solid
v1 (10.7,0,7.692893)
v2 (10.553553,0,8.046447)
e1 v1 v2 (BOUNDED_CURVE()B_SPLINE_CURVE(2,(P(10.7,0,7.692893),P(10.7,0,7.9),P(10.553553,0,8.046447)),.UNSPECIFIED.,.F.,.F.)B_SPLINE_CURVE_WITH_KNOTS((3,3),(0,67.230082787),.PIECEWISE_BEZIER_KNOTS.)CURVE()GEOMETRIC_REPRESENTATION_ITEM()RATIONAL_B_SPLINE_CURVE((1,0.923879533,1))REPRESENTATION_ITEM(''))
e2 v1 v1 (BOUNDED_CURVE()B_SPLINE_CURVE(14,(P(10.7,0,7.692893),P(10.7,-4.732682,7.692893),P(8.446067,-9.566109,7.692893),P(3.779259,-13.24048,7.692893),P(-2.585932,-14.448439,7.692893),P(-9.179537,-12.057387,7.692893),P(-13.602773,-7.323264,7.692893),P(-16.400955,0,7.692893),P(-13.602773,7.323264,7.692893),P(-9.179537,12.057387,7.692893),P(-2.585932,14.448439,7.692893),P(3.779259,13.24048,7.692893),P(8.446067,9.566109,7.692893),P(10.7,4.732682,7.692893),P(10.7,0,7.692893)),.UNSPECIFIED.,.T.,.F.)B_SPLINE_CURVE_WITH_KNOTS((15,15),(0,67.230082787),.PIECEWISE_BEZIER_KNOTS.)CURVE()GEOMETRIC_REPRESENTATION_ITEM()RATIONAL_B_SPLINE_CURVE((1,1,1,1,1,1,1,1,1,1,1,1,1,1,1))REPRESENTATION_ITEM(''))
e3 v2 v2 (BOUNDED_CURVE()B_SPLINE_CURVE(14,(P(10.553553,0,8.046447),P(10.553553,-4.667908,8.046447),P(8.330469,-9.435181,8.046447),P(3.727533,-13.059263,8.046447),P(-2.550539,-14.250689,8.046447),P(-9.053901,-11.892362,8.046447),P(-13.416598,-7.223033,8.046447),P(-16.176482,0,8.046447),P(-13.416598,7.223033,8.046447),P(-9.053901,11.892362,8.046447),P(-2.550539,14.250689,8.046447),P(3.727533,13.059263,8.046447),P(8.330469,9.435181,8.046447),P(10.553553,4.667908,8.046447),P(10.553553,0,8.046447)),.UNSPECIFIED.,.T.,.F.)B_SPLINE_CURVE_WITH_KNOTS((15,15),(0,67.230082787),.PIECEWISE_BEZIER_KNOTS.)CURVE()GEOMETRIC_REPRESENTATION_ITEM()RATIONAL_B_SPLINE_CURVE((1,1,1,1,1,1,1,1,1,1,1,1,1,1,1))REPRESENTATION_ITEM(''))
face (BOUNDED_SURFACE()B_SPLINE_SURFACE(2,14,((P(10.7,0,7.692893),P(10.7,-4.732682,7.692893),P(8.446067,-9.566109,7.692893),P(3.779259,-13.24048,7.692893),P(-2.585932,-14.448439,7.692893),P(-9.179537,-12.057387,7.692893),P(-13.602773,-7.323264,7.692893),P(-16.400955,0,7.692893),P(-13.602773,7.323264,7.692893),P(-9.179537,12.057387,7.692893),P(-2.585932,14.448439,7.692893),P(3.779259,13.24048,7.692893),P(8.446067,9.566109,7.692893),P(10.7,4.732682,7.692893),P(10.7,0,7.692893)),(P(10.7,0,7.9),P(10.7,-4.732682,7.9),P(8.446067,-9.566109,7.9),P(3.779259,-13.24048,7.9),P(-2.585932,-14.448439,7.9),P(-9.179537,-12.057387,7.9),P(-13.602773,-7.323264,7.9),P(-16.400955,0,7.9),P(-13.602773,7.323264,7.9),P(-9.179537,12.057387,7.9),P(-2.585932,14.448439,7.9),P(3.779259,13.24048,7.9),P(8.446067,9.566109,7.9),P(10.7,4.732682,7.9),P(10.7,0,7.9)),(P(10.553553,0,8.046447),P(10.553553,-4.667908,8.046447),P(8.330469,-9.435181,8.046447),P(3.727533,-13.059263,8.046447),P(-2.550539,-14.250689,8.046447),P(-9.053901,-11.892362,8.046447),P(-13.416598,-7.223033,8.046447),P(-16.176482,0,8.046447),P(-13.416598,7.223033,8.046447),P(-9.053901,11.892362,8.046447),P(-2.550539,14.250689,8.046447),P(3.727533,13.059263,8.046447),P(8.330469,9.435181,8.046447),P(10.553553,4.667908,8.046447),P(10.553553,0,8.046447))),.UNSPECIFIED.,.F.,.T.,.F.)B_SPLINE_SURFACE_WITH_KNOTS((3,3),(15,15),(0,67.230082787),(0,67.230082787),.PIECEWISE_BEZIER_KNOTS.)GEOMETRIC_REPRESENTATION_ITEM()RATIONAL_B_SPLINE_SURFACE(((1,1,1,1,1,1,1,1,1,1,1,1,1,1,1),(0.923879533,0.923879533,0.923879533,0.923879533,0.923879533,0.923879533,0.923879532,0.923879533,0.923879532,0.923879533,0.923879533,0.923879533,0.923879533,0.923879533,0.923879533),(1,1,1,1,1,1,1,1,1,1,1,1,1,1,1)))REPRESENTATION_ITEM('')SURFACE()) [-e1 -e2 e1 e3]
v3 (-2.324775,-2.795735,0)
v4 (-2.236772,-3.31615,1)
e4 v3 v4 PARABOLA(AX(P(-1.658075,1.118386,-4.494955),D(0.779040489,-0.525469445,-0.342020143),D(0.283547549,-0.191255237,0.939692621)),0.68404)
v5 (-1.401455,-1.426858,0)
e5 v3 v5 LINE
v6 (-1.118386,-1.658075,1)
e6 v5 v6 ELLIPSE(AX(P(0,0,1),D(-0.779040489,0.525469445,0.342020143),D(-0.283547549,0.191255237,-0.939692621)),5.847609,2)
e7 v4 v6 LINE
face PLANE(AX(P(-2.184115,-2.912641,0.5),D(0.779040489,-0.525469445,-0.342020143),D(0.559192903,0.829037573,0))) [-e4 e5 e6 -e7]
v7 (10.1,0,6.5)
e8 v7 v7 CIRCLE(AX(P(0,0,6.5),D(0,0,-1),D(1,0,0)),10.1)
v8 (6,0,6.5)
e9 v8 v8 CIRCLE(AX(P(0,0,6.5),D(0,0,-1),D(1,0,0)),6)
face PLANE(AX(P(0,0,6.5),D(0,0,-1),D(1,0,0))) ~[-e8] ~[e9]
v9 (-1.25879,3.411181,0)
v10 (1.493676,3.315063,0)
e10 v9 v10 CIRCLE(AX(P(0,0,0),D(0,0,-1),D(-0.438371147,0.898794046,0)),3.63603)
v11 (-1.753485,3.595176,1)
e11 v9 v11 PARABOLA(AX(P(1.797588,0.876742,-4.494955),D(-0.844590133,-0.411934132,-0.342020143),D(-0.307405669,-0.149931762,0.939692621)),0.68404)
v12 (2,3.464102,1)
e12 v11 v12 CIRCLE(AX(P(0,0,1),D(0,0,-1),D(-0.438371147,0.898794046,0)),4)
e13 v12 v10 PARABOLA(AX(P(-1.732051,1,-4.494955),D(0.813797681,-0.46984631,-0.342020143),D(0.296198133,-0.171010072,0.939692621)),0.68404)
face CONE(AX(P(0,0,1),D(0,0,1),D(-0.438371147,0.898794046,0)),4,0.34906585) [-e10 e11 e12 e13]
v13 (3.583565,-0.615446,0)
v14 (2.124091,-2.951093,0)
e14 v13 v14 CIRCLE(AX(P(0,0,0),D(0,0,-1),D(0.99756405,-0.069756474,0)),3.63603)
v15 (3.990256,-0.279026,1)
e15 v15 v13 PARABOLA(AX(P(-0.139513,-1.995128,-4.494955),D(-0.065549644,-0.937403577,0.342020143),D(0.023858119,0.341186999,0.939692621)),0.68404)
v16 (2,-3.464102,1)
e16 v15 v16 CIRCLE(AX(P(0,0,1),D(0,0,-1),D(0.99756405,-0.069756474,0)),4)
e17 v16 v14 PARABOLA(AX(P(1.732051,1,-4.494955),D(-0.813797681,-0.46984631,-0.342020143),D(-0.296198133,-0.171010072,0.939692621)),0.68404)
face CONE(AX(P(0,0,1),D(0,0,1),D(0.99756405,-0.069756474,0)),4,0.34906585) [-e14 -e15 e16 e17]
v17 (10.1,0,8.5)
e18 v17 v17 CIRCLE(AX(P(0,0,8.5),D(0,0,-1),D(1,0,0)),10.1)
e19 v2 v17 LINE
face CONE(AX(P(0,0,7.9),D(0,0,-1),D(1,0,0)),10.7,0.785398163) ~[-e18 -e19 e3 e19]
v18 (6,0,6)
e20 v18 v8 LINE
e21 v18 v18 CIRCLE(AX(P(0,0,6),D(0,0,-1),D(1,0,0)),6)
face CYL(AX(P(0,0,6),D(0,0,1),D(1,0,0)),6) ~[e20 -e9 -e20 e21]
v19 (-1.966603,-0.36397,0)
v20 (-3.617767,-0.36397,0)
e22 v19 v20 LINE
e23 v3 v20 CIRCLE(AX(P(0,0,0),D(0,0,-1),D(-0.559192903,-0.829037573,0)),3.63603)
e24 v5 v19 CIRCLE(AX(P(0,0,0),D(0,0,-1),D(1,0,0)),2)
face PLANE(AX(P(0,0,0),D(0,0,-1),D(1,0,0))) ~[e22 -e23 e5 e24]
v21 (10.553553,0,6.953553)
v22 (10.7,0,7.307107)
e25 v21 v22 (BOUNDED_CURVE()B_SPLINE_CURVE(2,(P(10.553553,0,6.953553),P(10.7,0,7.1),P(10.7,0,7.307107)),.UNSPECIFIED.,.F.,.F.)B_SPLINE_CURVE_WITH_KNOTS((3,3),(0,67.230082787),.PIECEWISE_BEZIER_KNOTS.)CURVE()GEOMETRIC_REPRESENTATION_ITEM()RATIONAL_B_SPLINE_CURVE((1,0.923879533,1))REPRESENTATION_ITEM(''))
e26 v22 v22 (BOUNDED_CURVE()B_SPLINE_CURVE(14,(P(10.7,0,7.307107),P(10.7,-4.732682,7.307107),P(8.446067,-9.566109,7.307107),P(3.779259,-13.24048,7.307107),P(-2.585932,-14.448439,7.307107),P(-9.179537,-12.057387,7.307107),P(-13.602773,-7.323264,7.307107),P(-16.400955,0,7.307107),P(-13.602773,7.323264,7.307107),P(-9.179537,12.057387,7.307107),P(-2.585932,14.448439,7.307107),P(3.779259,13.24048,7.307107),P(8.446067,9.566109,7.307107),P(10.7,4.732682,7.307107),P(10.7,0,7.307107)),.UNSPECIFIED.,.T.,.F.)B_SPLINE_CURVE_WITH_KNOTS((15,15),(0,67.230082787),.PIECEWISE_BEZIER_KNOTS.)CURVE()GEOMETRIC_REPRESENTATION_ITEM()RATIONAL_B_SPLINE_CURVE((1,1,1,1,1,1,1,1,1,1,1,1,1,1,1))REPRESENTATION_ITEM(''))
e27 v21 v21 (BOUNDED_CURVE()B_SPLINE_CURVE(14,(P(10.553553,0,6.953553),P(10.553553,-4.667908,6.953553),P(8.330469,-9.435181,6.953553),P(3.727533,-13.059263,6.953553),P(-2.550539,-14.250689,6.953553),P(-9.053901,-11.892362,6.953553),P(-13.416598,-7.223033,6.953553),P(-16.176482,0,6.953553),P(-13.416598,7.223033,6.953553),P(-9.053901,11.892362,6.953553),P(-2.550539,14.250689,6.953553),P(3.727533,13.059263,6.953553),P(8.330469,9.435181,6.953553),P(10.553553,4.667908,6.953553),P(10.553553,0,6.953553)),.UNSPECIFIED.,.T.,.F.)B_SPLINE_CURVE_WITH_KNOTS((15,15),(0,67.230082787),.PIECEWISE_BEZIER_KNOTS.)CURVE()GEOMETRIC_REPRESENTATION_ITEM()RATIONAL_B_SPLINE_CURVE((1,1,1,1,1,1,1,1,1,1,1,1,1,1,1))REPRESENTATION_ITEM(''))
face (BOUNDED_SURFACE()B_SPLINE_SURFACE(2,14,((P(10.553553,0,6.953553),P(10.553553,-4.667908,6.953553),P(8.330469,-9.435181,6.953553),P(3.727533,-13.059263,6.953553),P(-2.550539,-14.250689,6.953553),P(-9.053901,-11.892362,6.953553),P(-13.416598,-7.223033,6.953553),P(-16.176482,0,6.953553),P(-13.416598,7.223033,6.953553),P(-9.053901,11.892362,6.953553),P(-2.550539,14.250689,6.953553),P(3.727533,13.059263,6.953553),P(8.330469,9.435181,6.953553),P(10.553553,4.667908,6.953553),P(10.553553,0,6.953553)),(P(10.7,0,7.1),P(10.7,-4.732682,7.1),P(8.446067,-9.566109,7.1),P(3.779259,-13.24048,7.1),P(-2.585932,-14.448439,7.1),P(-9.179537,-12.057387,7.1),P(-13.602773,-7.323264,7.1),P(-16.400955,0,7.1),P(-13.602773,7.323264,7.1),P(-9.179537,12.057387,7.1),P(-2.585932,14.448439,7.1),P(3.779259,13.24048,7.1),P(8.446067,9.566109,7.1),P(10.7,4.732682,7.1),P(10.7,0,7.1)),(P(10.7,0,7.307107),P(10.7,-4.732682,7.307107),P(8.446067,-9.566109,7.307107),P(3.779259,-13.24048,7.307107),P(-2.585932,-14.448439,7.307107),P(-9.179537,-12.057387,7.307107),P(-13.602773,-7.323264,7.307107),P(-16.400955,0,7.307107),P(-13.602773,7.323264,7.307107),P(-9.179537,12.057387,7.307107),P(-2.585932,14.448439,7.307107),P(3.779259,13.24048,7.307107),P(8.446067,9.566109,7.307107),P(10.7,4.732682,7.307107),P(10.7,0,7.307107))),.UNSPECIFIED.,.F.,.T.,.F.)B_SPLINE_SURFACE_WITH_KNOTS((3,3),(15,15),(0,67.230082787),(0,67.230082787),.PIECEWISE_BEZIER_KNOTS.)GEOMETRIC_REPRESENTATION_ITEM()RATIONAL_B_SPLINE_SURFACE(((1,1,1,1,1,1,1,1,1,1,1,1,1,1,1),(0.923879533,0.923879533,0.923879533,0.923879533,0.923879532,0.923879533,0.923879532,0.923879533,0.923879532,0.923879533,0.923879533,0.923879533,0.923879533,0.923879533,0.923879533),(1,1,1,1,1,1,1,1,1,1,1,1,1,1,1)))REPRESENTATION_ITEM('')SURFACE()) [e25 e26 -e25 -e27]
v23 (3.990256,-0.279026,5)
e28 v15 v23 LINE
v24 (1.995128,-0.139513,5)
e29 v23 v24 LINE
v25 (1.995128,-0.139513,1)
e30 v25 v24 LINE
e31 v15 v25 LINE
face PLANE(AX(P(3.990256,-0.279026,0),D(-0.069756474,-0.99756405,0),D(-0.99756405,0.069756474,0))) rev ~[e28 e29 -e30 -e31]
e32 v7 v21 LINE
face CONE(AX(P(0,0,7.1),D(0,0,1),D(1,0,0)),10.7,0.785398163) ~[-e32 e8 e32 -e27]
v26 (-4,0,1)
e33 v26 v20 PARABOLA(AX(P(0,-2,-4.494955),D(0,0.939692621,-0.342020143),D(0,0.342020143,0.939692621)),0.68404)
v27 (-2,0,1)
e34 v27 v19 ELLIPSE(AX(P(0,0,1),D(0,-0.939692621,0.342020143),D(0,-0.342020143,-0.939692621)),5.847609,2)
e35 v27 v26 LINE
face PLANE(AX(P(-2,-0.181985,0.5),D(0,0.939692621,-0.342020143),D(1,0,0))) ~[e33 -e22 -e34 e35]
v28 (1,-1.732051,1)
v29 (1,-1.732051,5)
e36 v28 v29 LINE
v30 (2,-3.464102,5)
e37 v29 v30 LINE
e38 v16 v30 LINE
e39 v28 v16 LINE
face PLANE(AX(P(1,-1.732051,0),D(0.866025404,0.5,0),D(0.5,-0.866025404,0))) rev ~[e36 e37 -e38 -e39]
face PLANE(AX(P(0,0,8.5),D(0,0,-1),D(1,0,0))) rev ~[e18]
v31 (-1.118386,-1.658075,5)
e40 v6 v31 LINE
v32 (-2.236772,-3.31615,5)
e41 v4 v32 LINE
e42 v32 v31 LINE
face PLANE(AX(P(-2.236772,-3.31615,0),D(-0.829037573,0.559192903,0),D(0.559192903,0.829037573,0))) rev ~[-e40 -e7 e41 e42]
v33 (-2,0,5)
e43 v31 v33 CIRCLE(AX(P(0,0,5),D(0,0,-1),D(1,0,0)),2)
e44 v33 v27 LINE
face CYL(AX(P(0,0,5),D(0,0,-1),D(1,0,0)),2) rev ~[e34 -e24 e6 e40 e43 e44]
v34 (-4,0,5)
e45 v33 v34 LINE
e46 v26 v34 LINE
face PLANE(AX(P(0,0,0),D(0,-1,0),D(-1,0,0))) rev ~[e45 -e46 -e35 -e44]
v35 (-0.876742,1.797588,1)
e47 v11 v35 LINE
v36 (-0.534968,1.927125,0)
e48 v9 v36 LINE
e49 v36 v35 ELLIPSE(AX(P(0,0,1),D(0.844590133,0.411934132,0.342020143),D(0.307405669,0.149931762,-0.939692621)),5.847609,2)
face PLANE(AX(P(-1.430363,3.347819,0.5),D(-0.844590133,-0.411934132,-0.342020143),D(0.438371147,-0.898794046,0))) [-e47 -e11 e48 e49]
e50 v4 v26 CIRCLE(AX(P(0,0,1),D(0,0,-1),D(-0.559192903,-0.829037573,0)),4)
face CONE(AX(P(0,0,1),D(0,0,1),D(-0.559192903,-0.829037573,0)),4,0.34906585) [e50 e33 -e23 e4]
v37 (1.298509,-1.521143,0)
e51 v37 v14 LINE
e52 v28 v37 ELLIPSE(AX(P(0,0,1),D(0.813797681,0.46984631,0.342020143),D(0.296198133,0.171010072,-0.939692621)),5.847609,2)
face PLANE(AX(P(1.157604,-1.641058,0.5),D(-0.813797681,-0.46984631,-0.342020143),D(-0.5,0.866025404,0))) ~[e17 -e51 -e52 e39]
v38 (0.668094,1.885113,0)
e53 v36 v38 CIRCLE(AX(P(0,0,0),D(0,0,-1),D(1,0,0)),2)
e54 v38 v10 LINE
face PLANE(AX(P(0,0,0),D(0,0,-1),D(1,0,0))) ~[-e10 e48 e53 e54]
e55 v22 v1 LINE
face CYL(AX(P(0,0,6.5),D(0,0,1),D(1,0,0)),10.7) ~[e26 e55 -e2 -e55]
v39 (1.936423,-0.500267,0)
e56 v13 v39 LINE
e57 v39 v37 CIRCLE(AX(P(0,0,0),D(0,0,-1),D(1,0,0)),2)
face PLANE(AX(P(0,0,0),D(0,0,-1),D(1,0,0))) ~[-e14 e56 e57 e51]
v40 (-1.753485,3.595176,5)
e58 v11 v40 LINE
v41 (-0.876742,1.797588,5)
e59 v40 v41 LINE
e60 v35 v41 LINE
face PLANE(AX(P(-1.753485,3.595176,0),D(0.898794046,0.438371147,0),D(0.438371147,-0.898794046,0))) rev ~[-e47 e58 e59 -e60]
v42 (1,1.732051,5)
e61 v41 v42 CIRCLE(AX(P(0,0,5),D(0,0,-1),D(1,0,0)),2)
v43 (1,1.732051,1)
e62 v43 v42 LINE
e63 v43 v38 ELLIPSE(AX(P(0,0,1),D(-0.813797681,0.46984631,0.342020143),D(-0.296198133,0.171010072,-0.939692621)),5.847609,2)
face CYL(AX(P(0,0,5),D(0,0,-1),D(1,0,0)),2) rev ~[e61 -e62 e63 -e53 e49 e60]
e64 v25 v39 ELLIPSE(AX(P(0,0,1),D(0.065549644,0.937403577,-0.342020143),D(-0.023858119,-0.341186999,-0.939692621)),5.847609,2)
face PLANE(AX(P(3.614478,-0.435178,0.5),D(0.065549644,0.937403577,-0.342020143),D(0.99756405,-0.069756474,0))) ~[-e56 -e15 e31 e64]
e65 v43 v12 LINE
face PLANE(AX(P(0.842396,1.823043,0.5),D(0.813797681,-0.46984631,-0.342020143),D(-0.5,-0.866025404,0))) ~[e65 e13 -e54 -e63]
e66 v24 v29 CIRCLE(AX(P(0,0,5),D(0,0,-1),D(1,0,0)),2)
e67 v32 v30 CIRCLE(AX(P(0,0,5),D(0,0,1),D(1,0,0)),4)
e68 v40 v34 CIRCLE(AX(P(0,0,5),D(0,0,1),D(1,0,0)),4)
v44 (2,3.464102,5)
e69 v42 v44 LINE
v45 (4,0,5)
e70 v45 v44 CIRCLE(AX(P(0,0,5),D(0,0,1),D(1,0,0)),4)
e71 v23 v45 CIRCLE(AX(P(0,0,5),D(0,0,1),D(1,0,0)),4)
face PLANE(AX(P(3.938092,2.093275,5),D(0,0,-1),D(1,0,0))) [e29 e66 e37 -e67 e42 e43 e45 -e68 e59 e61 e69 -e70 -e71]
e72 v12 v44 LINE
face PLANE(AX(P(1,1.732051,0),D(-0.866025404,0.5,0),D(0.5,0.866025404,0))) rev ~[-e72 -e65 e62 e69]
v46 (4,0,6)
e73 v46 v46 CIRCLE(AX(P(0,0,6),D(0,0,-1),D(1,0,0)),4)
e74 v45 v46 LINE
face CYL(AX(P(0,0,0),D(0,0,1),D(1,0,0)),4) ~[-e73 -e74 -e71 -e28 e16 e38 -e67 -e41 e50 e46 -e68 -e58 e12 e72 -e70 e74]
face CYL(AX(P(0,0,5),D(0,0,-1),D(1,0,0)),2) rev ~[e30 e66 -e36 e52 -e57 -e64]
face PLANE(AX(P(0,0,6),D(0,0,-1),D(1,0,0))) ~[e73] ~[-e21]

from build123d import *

# Parameters (mm, degrees)
F3_DEPTH    = 5
F4_C1_SIZE2 = 0.3639702343
F4_C1_SIZE  = 1
F4_C2_SIZE2 = 0.3639702343
F4_C2_SIZE  = 1
F4_C3_SIZE2 = 0.3639702343
F4_C3_SIZE  = 1
F4_C4_SIZE2 = 0.3639702343
F4_C4_SIZE  = 1
F4_C5_SIZE2 = 0.3639702343
F4_C5_SIZE  = 1
F4_C6_SIZE2 = 1
F4_C6_SIZE  = 0.3639702343
F4_C7_SIZE2 = 0.3639702343
F4_C7_SIZE  = 1
F4_C8_SIZE2 = 1
F4_C8_SIZE  = 0.3639702343
F4_C9_SIZE2 = 0.3639702343
F4_C9_SIZE  = 1
F5_SIZE     = 0.6
F6_R        = 0.5


with BuildPart() as f1:
    # F0 (on Front) → F1 (revolve)
    with BuildSketch(Plane.XZ):
        Polygon((10.7, 8.5), (0, 8.5), (0, 5), (2, 5), (2, 0), (4, 0), (4, 6), (6, 6), (6, 6.5), (10.7, 6.5), align=None)
    revolve(axis=Axis((0, 0, 6.75), (0, 0, -1)))

    # F2 (on face) → F3 (cut)
    with BuildSketch(Plane(origin=(0, 0, 0), x_dir=(1, 0, 0), z_dir=(0, 0, -1))):
        with BuildLine():
            ThreePointArc((4, 0), (3.4641016151, -2), (2, -3.4641016151))
            Line((2, -3.4641016151), (3, -5.1961524227))
            Line((3, -5.1961524227), (5.9853843016, 0.4185388425))
            Line((5.9853843016, 0.4185388425), (3.990256201, 0.279025895))
            ThreePointArc((3.990256201, 0.279025895), (3.9975633081, 0.1395979868), (4, 0))
        make_face()
        with BuildLine():
            ThreePointArc((-2.2367716139, 3.3161502902), (-0.1395979868, 3.9975633081), (2, 3.4641016151))
            Line((2, 3.4641016151), (3, 5.1961524227))
            Line((3, 5.1961524227), (-3.3551574208, 4.9742254353))
            Line((-3.3551574208, 4.9742254353), (-2.2367716139, 3.3161502902))
        make_face()
        with BuildLine():
            ThreePointArc((-0.8767422936, -1.7975880926), (-1.6960961923, -1.0598385285), (-2, 0))
            Line((-2, 0), (-4, 0))
            ThreePointArc((-4, 0), (-3.3921923846, -2.1196770569), (-1.7534845872, -3.5951761852))
            Line((-1.7534845872, -3.5951761852), (-0.8767422936, -1.7975880926))
        make_face()
        with BuildLine():
            ThreePointArc((-1.7534845872, -3.5951761852), (-3.3921923846, -2.1196770569), (-4, 0))
            Line((-4, 0), (-6, 0))
            Line((-6, 0), (-2.6302268807, -5.3927642778))
            Line((-2.6302268807, -5.3927642778), (-1.7534845872, -3.5951761852))
        make_face()
        with BuildLine():
            ThreePointArc((2, 0), (1.7320508076, -1), (1, -1.7320508076))
            Line((1, -1.7320508076), (2, -3.4641016151))
            ThreePointArc((2, -3.4641016151), (3.4641016151, -2), (4, 0))
            ThreePointArc((4, 0), (3.9975633081, 0.1395979868), (3.990256201, 0.279025895))
            Line((3.990256201, 0.279025895), (1.9951281005, 0.1395129475))
            ThreePointArc((1.9951281005, 0.1395129475), (1.998781654, 0.0697989934), (2, 0))
        make_face()
        with BuildLine():
            ThreePointArc((-1.1183858069, 1.6580751451), (-0.0697989934, 1.998781654), (1, 1.7320508076))
            Line((1, 1.7320508076), (2, 3.4641016151))
            ThreePointArc((2, 3.4641016151), (-0.1395979868, 3.9975633081), (-2.2367716139, 3.3161502902))
            Line((-2.2367716139, 3.3161502902), (-1.1183858069, 1.6580751451))
        make_face()
        with BuildLine():
            ThreePointArc((-0.4983586629, -1.0217866811), (-0.9640965616, -0.6024343936), (-1.1368418442, 0))
            Line((-1.1368418442, 0), (-2, 0))
            ThreePointArc((-2, 0), (-1.6960961923, -1.0598385285), (-0.8767422936, -1.7975880926))
            Line((-0.8767422936, -1.7975880926), (-0.4983586629, -1.0217866811))
        make_face()
        with BuildLine():
            Line((-0.4983586629, -1.0217866811), (0, 0))
            Line((0, 0), (-1.1368418442, 0))
            ThreePointArc((-1.1368418442, 0), (-0.9640965616, -0.6024343936), (-0.4983586629, -1.0217866811))
        make_face()
        with BuildLine():
            Line((-0.6357138916, 0.9424846029), (0, 0))
            Line((0, 0), (0.5684209221, 0.9845339171))
            ThreePointArc((0.5684209221, 0.9845339171), (-0.0396752082, 1.1361493108), (-0.6357138916, 0.9424846029))
        make_face()
        with BuildLine():
            ThreePointArc((-0.6357138916, 0.9424846029), (-0.0396752082, 1.1361493108), (0.5684209221, 0.9845339171))
            Line((0.5684209221, 0.9845339171), (1, 1.7320508076))
            ThreePointArc((1, 1.7320508076), (-0.0697989934, 1.998781654), (-1.1183858069, 1.6580751451))
            Line((-1.1183858069, 1.6580751451), (-0.6357138916, 0.9424846029))
        make_face()
        with BuildLine():
            Line((1.1340725546, 0.0793020783), (0, 0))
            Line((0, 0), (0.5684209221, -0.9845339171))
            ThreePointArc((0.5684209221, -0.9845339171), (0.9845339171, -0.5684209221), (1.1368418442, 0))
            ThreePointArc((1.1368418442, 0), (1.1361493108, 0.0396752082), (1.1340725546, 0.0793020783))
        make_face()
        with BuildLine():
            ThreePointArc((1.1368418442, 0), (0.9845339171, -0.5684209221), (0.5684209221, -0.9845339171))
            Line((0.5684209221, -0.9845339171), (1, -1.7320508076))
            ThreePointArc((1, -1.7320508076), (1.7320508076, -1), (2, 0))
            ThreePointArc((2, 0), (1.998781654, 0.0697989934), (1.9951281005, 0.1395129475))
            Line((1.9951281005, 0.1395129475), (1.1340725546, 0.0793020783))
            ThreePointArc((1.1340725546, 0.0793020783), (1.1361493108, 0.0396752082), (1.1368418442, 0))
        make_face()
    extrude(amount=-F3_DEPTH, mode=Mode.SUBTRACT)

    # F4: chamfer of 1 x 0.3639702343 on 9 edges, made by hand

    # F4_c1
    f4_c1_edges = [f1.edges().sort_by_distance(p)[0] for p in [
        (0.1395979868, 3.9975633081, 0),
    ]]
    f4_c1_side = f1.faces().sort_by_distance((0.1395979868, 3.9975633081, 0.0072794047))[0]
    chamfer(f4_c1_edges, length=F4_C1_SIZE, length2=F4_C1_SIZE2, reference=f4_c1_side)

    # F4_c2
    f4_c2_edges = [f1.edges().sort_by_distance(p)[0] for p in [
        (-3.5317903714, -1.8778862511, 0),
    ]]
    f4_c2_side = f1.faces().sort_by_distance((-3.5317903714, -1.8778862511, 0.0072794047))[0]
    chamfer(f4_c2_edges, length=F4_C2_SIZE, length2=F4_C2_SIZE2, reference=f4_c2_side)

    # F4_c3
    f4_c3_edges = [f1.edges().sort_by_distance(p)[0] for p in [
        (3.3921923846, -2.1196770569, 0),
    ]]
    f4_c3_side = f1.faces().sort_by_distance((3.3921923846, -2.1196770569, 0.0072794047))[0]
    chamfer(f4_c3_edges, length=F4_C3_SIZE, length2=F4_C3_SIZE2, reference=f4_c3_side)

    # F4_c4
    f4_c4_edges = [f1.edges().sort_by_distance(p)[0] for p in [
        (2.8111503402, -0.1965747812, 0),
    ]]
    f4_c4_side = f1.faces().sort_by_distance((2.8111503402, -0.1965747812, 0.0072794047))[0]
    chamfer(f4_c4_edges, length=F4_C4_SIZE, length2=F4_C4_SIZE2, reference=f4_c4_side)

    # F4_c5
    f4_c5_edges = [f1.edges().sort_by_distance(p)[0] for p in [
        (1.4090074414, 2.4404724768, 0),
    ]]
    f4_c5_side = f1.faces().sort_by_distance((1.4090074414, 2.4404724768, 0.0072794047))[0]
    chamfer(f4_c5_edges, length=F4_C5_SIZE, length2=F4_C5_SIZE2, reference=f4_c5_side)

    # F4_c6
    f4_c6_edges = [f1.edges().sort_by_distance(p)[0] for p in [
        (-1.2353364159, 2.5328149991, 0),
    ]]
    f4_c6_side = f1.faces().sort_by_distance((-1.2287937303, 2.5360060801, 0))[0]
    chamfer(f4_c6_edges, length=F4_C6_SIZE, length2=F4_C6_SIZE2, reference=f4_c6_side)

    # F4_c7
    f4_c7_edges = [f1.edges().sort_by_distance(p)[0] for p in [
        (-2.8180148829, 0, 0),
    ]]
    f4_c7_side = f1.faces().sort_by_distance((-2.8180148829, 0, 0.0072794047))[0]
    chamfer(f4_c7_edges, length=F4_C7_SIZE, length2=F4_C7_SIZE2, reference=f4_c7_side)

    # F4_c8
    f4_c8_edges = [f1.edges().sort_by_distance(p)[0] for p in [
        (-1.5758139244, -2.3362402179, 0),
    ]]
    f4_c8_side = f1.faces().sort_by_distance((-1.5818488244, -2.3321696265, 0))[0]
    chamfer(f4_c8_edges, length=F4_C8_SIZE, length2=F4_C8_SIZE2, reference=f4_c8_side)

    # F4_c9
    f4_c9_edges = [f1.edges().sort_by_distance(p)[0] for p in [
        (1.4090074414, -2.4404724768, 0),
    ]]
    f4_c9_side = f1.faces().sort_by_distance((1.4090074414, -2.4404724768, 0.0072794047))[0]
    chamfer(f4_c9_edges, length=F4_C9_SIZE, length2=F4_C9_SIZE2, reference=f4_c9_side)

    # F5
    f5_edges = [f1.edges().sort_by_distance(p)[0] for p in [
        (-10.7, 0, 8.5),
        (-10.7, 0, 6.5),
    ]]
    chamfer(f5_edges, length=F5_SIZE)

    # F6
    f6_edges = [f1.edges().sort_by_distance(p)[0] for p in [
        (10.7, 0, 7.5),
        (-10.7, 0, 7.1),
        (-10.7, 0, 7.9),
    ]]
    fillet(f6_edges, radius=F6_R)


solid = f1.part
